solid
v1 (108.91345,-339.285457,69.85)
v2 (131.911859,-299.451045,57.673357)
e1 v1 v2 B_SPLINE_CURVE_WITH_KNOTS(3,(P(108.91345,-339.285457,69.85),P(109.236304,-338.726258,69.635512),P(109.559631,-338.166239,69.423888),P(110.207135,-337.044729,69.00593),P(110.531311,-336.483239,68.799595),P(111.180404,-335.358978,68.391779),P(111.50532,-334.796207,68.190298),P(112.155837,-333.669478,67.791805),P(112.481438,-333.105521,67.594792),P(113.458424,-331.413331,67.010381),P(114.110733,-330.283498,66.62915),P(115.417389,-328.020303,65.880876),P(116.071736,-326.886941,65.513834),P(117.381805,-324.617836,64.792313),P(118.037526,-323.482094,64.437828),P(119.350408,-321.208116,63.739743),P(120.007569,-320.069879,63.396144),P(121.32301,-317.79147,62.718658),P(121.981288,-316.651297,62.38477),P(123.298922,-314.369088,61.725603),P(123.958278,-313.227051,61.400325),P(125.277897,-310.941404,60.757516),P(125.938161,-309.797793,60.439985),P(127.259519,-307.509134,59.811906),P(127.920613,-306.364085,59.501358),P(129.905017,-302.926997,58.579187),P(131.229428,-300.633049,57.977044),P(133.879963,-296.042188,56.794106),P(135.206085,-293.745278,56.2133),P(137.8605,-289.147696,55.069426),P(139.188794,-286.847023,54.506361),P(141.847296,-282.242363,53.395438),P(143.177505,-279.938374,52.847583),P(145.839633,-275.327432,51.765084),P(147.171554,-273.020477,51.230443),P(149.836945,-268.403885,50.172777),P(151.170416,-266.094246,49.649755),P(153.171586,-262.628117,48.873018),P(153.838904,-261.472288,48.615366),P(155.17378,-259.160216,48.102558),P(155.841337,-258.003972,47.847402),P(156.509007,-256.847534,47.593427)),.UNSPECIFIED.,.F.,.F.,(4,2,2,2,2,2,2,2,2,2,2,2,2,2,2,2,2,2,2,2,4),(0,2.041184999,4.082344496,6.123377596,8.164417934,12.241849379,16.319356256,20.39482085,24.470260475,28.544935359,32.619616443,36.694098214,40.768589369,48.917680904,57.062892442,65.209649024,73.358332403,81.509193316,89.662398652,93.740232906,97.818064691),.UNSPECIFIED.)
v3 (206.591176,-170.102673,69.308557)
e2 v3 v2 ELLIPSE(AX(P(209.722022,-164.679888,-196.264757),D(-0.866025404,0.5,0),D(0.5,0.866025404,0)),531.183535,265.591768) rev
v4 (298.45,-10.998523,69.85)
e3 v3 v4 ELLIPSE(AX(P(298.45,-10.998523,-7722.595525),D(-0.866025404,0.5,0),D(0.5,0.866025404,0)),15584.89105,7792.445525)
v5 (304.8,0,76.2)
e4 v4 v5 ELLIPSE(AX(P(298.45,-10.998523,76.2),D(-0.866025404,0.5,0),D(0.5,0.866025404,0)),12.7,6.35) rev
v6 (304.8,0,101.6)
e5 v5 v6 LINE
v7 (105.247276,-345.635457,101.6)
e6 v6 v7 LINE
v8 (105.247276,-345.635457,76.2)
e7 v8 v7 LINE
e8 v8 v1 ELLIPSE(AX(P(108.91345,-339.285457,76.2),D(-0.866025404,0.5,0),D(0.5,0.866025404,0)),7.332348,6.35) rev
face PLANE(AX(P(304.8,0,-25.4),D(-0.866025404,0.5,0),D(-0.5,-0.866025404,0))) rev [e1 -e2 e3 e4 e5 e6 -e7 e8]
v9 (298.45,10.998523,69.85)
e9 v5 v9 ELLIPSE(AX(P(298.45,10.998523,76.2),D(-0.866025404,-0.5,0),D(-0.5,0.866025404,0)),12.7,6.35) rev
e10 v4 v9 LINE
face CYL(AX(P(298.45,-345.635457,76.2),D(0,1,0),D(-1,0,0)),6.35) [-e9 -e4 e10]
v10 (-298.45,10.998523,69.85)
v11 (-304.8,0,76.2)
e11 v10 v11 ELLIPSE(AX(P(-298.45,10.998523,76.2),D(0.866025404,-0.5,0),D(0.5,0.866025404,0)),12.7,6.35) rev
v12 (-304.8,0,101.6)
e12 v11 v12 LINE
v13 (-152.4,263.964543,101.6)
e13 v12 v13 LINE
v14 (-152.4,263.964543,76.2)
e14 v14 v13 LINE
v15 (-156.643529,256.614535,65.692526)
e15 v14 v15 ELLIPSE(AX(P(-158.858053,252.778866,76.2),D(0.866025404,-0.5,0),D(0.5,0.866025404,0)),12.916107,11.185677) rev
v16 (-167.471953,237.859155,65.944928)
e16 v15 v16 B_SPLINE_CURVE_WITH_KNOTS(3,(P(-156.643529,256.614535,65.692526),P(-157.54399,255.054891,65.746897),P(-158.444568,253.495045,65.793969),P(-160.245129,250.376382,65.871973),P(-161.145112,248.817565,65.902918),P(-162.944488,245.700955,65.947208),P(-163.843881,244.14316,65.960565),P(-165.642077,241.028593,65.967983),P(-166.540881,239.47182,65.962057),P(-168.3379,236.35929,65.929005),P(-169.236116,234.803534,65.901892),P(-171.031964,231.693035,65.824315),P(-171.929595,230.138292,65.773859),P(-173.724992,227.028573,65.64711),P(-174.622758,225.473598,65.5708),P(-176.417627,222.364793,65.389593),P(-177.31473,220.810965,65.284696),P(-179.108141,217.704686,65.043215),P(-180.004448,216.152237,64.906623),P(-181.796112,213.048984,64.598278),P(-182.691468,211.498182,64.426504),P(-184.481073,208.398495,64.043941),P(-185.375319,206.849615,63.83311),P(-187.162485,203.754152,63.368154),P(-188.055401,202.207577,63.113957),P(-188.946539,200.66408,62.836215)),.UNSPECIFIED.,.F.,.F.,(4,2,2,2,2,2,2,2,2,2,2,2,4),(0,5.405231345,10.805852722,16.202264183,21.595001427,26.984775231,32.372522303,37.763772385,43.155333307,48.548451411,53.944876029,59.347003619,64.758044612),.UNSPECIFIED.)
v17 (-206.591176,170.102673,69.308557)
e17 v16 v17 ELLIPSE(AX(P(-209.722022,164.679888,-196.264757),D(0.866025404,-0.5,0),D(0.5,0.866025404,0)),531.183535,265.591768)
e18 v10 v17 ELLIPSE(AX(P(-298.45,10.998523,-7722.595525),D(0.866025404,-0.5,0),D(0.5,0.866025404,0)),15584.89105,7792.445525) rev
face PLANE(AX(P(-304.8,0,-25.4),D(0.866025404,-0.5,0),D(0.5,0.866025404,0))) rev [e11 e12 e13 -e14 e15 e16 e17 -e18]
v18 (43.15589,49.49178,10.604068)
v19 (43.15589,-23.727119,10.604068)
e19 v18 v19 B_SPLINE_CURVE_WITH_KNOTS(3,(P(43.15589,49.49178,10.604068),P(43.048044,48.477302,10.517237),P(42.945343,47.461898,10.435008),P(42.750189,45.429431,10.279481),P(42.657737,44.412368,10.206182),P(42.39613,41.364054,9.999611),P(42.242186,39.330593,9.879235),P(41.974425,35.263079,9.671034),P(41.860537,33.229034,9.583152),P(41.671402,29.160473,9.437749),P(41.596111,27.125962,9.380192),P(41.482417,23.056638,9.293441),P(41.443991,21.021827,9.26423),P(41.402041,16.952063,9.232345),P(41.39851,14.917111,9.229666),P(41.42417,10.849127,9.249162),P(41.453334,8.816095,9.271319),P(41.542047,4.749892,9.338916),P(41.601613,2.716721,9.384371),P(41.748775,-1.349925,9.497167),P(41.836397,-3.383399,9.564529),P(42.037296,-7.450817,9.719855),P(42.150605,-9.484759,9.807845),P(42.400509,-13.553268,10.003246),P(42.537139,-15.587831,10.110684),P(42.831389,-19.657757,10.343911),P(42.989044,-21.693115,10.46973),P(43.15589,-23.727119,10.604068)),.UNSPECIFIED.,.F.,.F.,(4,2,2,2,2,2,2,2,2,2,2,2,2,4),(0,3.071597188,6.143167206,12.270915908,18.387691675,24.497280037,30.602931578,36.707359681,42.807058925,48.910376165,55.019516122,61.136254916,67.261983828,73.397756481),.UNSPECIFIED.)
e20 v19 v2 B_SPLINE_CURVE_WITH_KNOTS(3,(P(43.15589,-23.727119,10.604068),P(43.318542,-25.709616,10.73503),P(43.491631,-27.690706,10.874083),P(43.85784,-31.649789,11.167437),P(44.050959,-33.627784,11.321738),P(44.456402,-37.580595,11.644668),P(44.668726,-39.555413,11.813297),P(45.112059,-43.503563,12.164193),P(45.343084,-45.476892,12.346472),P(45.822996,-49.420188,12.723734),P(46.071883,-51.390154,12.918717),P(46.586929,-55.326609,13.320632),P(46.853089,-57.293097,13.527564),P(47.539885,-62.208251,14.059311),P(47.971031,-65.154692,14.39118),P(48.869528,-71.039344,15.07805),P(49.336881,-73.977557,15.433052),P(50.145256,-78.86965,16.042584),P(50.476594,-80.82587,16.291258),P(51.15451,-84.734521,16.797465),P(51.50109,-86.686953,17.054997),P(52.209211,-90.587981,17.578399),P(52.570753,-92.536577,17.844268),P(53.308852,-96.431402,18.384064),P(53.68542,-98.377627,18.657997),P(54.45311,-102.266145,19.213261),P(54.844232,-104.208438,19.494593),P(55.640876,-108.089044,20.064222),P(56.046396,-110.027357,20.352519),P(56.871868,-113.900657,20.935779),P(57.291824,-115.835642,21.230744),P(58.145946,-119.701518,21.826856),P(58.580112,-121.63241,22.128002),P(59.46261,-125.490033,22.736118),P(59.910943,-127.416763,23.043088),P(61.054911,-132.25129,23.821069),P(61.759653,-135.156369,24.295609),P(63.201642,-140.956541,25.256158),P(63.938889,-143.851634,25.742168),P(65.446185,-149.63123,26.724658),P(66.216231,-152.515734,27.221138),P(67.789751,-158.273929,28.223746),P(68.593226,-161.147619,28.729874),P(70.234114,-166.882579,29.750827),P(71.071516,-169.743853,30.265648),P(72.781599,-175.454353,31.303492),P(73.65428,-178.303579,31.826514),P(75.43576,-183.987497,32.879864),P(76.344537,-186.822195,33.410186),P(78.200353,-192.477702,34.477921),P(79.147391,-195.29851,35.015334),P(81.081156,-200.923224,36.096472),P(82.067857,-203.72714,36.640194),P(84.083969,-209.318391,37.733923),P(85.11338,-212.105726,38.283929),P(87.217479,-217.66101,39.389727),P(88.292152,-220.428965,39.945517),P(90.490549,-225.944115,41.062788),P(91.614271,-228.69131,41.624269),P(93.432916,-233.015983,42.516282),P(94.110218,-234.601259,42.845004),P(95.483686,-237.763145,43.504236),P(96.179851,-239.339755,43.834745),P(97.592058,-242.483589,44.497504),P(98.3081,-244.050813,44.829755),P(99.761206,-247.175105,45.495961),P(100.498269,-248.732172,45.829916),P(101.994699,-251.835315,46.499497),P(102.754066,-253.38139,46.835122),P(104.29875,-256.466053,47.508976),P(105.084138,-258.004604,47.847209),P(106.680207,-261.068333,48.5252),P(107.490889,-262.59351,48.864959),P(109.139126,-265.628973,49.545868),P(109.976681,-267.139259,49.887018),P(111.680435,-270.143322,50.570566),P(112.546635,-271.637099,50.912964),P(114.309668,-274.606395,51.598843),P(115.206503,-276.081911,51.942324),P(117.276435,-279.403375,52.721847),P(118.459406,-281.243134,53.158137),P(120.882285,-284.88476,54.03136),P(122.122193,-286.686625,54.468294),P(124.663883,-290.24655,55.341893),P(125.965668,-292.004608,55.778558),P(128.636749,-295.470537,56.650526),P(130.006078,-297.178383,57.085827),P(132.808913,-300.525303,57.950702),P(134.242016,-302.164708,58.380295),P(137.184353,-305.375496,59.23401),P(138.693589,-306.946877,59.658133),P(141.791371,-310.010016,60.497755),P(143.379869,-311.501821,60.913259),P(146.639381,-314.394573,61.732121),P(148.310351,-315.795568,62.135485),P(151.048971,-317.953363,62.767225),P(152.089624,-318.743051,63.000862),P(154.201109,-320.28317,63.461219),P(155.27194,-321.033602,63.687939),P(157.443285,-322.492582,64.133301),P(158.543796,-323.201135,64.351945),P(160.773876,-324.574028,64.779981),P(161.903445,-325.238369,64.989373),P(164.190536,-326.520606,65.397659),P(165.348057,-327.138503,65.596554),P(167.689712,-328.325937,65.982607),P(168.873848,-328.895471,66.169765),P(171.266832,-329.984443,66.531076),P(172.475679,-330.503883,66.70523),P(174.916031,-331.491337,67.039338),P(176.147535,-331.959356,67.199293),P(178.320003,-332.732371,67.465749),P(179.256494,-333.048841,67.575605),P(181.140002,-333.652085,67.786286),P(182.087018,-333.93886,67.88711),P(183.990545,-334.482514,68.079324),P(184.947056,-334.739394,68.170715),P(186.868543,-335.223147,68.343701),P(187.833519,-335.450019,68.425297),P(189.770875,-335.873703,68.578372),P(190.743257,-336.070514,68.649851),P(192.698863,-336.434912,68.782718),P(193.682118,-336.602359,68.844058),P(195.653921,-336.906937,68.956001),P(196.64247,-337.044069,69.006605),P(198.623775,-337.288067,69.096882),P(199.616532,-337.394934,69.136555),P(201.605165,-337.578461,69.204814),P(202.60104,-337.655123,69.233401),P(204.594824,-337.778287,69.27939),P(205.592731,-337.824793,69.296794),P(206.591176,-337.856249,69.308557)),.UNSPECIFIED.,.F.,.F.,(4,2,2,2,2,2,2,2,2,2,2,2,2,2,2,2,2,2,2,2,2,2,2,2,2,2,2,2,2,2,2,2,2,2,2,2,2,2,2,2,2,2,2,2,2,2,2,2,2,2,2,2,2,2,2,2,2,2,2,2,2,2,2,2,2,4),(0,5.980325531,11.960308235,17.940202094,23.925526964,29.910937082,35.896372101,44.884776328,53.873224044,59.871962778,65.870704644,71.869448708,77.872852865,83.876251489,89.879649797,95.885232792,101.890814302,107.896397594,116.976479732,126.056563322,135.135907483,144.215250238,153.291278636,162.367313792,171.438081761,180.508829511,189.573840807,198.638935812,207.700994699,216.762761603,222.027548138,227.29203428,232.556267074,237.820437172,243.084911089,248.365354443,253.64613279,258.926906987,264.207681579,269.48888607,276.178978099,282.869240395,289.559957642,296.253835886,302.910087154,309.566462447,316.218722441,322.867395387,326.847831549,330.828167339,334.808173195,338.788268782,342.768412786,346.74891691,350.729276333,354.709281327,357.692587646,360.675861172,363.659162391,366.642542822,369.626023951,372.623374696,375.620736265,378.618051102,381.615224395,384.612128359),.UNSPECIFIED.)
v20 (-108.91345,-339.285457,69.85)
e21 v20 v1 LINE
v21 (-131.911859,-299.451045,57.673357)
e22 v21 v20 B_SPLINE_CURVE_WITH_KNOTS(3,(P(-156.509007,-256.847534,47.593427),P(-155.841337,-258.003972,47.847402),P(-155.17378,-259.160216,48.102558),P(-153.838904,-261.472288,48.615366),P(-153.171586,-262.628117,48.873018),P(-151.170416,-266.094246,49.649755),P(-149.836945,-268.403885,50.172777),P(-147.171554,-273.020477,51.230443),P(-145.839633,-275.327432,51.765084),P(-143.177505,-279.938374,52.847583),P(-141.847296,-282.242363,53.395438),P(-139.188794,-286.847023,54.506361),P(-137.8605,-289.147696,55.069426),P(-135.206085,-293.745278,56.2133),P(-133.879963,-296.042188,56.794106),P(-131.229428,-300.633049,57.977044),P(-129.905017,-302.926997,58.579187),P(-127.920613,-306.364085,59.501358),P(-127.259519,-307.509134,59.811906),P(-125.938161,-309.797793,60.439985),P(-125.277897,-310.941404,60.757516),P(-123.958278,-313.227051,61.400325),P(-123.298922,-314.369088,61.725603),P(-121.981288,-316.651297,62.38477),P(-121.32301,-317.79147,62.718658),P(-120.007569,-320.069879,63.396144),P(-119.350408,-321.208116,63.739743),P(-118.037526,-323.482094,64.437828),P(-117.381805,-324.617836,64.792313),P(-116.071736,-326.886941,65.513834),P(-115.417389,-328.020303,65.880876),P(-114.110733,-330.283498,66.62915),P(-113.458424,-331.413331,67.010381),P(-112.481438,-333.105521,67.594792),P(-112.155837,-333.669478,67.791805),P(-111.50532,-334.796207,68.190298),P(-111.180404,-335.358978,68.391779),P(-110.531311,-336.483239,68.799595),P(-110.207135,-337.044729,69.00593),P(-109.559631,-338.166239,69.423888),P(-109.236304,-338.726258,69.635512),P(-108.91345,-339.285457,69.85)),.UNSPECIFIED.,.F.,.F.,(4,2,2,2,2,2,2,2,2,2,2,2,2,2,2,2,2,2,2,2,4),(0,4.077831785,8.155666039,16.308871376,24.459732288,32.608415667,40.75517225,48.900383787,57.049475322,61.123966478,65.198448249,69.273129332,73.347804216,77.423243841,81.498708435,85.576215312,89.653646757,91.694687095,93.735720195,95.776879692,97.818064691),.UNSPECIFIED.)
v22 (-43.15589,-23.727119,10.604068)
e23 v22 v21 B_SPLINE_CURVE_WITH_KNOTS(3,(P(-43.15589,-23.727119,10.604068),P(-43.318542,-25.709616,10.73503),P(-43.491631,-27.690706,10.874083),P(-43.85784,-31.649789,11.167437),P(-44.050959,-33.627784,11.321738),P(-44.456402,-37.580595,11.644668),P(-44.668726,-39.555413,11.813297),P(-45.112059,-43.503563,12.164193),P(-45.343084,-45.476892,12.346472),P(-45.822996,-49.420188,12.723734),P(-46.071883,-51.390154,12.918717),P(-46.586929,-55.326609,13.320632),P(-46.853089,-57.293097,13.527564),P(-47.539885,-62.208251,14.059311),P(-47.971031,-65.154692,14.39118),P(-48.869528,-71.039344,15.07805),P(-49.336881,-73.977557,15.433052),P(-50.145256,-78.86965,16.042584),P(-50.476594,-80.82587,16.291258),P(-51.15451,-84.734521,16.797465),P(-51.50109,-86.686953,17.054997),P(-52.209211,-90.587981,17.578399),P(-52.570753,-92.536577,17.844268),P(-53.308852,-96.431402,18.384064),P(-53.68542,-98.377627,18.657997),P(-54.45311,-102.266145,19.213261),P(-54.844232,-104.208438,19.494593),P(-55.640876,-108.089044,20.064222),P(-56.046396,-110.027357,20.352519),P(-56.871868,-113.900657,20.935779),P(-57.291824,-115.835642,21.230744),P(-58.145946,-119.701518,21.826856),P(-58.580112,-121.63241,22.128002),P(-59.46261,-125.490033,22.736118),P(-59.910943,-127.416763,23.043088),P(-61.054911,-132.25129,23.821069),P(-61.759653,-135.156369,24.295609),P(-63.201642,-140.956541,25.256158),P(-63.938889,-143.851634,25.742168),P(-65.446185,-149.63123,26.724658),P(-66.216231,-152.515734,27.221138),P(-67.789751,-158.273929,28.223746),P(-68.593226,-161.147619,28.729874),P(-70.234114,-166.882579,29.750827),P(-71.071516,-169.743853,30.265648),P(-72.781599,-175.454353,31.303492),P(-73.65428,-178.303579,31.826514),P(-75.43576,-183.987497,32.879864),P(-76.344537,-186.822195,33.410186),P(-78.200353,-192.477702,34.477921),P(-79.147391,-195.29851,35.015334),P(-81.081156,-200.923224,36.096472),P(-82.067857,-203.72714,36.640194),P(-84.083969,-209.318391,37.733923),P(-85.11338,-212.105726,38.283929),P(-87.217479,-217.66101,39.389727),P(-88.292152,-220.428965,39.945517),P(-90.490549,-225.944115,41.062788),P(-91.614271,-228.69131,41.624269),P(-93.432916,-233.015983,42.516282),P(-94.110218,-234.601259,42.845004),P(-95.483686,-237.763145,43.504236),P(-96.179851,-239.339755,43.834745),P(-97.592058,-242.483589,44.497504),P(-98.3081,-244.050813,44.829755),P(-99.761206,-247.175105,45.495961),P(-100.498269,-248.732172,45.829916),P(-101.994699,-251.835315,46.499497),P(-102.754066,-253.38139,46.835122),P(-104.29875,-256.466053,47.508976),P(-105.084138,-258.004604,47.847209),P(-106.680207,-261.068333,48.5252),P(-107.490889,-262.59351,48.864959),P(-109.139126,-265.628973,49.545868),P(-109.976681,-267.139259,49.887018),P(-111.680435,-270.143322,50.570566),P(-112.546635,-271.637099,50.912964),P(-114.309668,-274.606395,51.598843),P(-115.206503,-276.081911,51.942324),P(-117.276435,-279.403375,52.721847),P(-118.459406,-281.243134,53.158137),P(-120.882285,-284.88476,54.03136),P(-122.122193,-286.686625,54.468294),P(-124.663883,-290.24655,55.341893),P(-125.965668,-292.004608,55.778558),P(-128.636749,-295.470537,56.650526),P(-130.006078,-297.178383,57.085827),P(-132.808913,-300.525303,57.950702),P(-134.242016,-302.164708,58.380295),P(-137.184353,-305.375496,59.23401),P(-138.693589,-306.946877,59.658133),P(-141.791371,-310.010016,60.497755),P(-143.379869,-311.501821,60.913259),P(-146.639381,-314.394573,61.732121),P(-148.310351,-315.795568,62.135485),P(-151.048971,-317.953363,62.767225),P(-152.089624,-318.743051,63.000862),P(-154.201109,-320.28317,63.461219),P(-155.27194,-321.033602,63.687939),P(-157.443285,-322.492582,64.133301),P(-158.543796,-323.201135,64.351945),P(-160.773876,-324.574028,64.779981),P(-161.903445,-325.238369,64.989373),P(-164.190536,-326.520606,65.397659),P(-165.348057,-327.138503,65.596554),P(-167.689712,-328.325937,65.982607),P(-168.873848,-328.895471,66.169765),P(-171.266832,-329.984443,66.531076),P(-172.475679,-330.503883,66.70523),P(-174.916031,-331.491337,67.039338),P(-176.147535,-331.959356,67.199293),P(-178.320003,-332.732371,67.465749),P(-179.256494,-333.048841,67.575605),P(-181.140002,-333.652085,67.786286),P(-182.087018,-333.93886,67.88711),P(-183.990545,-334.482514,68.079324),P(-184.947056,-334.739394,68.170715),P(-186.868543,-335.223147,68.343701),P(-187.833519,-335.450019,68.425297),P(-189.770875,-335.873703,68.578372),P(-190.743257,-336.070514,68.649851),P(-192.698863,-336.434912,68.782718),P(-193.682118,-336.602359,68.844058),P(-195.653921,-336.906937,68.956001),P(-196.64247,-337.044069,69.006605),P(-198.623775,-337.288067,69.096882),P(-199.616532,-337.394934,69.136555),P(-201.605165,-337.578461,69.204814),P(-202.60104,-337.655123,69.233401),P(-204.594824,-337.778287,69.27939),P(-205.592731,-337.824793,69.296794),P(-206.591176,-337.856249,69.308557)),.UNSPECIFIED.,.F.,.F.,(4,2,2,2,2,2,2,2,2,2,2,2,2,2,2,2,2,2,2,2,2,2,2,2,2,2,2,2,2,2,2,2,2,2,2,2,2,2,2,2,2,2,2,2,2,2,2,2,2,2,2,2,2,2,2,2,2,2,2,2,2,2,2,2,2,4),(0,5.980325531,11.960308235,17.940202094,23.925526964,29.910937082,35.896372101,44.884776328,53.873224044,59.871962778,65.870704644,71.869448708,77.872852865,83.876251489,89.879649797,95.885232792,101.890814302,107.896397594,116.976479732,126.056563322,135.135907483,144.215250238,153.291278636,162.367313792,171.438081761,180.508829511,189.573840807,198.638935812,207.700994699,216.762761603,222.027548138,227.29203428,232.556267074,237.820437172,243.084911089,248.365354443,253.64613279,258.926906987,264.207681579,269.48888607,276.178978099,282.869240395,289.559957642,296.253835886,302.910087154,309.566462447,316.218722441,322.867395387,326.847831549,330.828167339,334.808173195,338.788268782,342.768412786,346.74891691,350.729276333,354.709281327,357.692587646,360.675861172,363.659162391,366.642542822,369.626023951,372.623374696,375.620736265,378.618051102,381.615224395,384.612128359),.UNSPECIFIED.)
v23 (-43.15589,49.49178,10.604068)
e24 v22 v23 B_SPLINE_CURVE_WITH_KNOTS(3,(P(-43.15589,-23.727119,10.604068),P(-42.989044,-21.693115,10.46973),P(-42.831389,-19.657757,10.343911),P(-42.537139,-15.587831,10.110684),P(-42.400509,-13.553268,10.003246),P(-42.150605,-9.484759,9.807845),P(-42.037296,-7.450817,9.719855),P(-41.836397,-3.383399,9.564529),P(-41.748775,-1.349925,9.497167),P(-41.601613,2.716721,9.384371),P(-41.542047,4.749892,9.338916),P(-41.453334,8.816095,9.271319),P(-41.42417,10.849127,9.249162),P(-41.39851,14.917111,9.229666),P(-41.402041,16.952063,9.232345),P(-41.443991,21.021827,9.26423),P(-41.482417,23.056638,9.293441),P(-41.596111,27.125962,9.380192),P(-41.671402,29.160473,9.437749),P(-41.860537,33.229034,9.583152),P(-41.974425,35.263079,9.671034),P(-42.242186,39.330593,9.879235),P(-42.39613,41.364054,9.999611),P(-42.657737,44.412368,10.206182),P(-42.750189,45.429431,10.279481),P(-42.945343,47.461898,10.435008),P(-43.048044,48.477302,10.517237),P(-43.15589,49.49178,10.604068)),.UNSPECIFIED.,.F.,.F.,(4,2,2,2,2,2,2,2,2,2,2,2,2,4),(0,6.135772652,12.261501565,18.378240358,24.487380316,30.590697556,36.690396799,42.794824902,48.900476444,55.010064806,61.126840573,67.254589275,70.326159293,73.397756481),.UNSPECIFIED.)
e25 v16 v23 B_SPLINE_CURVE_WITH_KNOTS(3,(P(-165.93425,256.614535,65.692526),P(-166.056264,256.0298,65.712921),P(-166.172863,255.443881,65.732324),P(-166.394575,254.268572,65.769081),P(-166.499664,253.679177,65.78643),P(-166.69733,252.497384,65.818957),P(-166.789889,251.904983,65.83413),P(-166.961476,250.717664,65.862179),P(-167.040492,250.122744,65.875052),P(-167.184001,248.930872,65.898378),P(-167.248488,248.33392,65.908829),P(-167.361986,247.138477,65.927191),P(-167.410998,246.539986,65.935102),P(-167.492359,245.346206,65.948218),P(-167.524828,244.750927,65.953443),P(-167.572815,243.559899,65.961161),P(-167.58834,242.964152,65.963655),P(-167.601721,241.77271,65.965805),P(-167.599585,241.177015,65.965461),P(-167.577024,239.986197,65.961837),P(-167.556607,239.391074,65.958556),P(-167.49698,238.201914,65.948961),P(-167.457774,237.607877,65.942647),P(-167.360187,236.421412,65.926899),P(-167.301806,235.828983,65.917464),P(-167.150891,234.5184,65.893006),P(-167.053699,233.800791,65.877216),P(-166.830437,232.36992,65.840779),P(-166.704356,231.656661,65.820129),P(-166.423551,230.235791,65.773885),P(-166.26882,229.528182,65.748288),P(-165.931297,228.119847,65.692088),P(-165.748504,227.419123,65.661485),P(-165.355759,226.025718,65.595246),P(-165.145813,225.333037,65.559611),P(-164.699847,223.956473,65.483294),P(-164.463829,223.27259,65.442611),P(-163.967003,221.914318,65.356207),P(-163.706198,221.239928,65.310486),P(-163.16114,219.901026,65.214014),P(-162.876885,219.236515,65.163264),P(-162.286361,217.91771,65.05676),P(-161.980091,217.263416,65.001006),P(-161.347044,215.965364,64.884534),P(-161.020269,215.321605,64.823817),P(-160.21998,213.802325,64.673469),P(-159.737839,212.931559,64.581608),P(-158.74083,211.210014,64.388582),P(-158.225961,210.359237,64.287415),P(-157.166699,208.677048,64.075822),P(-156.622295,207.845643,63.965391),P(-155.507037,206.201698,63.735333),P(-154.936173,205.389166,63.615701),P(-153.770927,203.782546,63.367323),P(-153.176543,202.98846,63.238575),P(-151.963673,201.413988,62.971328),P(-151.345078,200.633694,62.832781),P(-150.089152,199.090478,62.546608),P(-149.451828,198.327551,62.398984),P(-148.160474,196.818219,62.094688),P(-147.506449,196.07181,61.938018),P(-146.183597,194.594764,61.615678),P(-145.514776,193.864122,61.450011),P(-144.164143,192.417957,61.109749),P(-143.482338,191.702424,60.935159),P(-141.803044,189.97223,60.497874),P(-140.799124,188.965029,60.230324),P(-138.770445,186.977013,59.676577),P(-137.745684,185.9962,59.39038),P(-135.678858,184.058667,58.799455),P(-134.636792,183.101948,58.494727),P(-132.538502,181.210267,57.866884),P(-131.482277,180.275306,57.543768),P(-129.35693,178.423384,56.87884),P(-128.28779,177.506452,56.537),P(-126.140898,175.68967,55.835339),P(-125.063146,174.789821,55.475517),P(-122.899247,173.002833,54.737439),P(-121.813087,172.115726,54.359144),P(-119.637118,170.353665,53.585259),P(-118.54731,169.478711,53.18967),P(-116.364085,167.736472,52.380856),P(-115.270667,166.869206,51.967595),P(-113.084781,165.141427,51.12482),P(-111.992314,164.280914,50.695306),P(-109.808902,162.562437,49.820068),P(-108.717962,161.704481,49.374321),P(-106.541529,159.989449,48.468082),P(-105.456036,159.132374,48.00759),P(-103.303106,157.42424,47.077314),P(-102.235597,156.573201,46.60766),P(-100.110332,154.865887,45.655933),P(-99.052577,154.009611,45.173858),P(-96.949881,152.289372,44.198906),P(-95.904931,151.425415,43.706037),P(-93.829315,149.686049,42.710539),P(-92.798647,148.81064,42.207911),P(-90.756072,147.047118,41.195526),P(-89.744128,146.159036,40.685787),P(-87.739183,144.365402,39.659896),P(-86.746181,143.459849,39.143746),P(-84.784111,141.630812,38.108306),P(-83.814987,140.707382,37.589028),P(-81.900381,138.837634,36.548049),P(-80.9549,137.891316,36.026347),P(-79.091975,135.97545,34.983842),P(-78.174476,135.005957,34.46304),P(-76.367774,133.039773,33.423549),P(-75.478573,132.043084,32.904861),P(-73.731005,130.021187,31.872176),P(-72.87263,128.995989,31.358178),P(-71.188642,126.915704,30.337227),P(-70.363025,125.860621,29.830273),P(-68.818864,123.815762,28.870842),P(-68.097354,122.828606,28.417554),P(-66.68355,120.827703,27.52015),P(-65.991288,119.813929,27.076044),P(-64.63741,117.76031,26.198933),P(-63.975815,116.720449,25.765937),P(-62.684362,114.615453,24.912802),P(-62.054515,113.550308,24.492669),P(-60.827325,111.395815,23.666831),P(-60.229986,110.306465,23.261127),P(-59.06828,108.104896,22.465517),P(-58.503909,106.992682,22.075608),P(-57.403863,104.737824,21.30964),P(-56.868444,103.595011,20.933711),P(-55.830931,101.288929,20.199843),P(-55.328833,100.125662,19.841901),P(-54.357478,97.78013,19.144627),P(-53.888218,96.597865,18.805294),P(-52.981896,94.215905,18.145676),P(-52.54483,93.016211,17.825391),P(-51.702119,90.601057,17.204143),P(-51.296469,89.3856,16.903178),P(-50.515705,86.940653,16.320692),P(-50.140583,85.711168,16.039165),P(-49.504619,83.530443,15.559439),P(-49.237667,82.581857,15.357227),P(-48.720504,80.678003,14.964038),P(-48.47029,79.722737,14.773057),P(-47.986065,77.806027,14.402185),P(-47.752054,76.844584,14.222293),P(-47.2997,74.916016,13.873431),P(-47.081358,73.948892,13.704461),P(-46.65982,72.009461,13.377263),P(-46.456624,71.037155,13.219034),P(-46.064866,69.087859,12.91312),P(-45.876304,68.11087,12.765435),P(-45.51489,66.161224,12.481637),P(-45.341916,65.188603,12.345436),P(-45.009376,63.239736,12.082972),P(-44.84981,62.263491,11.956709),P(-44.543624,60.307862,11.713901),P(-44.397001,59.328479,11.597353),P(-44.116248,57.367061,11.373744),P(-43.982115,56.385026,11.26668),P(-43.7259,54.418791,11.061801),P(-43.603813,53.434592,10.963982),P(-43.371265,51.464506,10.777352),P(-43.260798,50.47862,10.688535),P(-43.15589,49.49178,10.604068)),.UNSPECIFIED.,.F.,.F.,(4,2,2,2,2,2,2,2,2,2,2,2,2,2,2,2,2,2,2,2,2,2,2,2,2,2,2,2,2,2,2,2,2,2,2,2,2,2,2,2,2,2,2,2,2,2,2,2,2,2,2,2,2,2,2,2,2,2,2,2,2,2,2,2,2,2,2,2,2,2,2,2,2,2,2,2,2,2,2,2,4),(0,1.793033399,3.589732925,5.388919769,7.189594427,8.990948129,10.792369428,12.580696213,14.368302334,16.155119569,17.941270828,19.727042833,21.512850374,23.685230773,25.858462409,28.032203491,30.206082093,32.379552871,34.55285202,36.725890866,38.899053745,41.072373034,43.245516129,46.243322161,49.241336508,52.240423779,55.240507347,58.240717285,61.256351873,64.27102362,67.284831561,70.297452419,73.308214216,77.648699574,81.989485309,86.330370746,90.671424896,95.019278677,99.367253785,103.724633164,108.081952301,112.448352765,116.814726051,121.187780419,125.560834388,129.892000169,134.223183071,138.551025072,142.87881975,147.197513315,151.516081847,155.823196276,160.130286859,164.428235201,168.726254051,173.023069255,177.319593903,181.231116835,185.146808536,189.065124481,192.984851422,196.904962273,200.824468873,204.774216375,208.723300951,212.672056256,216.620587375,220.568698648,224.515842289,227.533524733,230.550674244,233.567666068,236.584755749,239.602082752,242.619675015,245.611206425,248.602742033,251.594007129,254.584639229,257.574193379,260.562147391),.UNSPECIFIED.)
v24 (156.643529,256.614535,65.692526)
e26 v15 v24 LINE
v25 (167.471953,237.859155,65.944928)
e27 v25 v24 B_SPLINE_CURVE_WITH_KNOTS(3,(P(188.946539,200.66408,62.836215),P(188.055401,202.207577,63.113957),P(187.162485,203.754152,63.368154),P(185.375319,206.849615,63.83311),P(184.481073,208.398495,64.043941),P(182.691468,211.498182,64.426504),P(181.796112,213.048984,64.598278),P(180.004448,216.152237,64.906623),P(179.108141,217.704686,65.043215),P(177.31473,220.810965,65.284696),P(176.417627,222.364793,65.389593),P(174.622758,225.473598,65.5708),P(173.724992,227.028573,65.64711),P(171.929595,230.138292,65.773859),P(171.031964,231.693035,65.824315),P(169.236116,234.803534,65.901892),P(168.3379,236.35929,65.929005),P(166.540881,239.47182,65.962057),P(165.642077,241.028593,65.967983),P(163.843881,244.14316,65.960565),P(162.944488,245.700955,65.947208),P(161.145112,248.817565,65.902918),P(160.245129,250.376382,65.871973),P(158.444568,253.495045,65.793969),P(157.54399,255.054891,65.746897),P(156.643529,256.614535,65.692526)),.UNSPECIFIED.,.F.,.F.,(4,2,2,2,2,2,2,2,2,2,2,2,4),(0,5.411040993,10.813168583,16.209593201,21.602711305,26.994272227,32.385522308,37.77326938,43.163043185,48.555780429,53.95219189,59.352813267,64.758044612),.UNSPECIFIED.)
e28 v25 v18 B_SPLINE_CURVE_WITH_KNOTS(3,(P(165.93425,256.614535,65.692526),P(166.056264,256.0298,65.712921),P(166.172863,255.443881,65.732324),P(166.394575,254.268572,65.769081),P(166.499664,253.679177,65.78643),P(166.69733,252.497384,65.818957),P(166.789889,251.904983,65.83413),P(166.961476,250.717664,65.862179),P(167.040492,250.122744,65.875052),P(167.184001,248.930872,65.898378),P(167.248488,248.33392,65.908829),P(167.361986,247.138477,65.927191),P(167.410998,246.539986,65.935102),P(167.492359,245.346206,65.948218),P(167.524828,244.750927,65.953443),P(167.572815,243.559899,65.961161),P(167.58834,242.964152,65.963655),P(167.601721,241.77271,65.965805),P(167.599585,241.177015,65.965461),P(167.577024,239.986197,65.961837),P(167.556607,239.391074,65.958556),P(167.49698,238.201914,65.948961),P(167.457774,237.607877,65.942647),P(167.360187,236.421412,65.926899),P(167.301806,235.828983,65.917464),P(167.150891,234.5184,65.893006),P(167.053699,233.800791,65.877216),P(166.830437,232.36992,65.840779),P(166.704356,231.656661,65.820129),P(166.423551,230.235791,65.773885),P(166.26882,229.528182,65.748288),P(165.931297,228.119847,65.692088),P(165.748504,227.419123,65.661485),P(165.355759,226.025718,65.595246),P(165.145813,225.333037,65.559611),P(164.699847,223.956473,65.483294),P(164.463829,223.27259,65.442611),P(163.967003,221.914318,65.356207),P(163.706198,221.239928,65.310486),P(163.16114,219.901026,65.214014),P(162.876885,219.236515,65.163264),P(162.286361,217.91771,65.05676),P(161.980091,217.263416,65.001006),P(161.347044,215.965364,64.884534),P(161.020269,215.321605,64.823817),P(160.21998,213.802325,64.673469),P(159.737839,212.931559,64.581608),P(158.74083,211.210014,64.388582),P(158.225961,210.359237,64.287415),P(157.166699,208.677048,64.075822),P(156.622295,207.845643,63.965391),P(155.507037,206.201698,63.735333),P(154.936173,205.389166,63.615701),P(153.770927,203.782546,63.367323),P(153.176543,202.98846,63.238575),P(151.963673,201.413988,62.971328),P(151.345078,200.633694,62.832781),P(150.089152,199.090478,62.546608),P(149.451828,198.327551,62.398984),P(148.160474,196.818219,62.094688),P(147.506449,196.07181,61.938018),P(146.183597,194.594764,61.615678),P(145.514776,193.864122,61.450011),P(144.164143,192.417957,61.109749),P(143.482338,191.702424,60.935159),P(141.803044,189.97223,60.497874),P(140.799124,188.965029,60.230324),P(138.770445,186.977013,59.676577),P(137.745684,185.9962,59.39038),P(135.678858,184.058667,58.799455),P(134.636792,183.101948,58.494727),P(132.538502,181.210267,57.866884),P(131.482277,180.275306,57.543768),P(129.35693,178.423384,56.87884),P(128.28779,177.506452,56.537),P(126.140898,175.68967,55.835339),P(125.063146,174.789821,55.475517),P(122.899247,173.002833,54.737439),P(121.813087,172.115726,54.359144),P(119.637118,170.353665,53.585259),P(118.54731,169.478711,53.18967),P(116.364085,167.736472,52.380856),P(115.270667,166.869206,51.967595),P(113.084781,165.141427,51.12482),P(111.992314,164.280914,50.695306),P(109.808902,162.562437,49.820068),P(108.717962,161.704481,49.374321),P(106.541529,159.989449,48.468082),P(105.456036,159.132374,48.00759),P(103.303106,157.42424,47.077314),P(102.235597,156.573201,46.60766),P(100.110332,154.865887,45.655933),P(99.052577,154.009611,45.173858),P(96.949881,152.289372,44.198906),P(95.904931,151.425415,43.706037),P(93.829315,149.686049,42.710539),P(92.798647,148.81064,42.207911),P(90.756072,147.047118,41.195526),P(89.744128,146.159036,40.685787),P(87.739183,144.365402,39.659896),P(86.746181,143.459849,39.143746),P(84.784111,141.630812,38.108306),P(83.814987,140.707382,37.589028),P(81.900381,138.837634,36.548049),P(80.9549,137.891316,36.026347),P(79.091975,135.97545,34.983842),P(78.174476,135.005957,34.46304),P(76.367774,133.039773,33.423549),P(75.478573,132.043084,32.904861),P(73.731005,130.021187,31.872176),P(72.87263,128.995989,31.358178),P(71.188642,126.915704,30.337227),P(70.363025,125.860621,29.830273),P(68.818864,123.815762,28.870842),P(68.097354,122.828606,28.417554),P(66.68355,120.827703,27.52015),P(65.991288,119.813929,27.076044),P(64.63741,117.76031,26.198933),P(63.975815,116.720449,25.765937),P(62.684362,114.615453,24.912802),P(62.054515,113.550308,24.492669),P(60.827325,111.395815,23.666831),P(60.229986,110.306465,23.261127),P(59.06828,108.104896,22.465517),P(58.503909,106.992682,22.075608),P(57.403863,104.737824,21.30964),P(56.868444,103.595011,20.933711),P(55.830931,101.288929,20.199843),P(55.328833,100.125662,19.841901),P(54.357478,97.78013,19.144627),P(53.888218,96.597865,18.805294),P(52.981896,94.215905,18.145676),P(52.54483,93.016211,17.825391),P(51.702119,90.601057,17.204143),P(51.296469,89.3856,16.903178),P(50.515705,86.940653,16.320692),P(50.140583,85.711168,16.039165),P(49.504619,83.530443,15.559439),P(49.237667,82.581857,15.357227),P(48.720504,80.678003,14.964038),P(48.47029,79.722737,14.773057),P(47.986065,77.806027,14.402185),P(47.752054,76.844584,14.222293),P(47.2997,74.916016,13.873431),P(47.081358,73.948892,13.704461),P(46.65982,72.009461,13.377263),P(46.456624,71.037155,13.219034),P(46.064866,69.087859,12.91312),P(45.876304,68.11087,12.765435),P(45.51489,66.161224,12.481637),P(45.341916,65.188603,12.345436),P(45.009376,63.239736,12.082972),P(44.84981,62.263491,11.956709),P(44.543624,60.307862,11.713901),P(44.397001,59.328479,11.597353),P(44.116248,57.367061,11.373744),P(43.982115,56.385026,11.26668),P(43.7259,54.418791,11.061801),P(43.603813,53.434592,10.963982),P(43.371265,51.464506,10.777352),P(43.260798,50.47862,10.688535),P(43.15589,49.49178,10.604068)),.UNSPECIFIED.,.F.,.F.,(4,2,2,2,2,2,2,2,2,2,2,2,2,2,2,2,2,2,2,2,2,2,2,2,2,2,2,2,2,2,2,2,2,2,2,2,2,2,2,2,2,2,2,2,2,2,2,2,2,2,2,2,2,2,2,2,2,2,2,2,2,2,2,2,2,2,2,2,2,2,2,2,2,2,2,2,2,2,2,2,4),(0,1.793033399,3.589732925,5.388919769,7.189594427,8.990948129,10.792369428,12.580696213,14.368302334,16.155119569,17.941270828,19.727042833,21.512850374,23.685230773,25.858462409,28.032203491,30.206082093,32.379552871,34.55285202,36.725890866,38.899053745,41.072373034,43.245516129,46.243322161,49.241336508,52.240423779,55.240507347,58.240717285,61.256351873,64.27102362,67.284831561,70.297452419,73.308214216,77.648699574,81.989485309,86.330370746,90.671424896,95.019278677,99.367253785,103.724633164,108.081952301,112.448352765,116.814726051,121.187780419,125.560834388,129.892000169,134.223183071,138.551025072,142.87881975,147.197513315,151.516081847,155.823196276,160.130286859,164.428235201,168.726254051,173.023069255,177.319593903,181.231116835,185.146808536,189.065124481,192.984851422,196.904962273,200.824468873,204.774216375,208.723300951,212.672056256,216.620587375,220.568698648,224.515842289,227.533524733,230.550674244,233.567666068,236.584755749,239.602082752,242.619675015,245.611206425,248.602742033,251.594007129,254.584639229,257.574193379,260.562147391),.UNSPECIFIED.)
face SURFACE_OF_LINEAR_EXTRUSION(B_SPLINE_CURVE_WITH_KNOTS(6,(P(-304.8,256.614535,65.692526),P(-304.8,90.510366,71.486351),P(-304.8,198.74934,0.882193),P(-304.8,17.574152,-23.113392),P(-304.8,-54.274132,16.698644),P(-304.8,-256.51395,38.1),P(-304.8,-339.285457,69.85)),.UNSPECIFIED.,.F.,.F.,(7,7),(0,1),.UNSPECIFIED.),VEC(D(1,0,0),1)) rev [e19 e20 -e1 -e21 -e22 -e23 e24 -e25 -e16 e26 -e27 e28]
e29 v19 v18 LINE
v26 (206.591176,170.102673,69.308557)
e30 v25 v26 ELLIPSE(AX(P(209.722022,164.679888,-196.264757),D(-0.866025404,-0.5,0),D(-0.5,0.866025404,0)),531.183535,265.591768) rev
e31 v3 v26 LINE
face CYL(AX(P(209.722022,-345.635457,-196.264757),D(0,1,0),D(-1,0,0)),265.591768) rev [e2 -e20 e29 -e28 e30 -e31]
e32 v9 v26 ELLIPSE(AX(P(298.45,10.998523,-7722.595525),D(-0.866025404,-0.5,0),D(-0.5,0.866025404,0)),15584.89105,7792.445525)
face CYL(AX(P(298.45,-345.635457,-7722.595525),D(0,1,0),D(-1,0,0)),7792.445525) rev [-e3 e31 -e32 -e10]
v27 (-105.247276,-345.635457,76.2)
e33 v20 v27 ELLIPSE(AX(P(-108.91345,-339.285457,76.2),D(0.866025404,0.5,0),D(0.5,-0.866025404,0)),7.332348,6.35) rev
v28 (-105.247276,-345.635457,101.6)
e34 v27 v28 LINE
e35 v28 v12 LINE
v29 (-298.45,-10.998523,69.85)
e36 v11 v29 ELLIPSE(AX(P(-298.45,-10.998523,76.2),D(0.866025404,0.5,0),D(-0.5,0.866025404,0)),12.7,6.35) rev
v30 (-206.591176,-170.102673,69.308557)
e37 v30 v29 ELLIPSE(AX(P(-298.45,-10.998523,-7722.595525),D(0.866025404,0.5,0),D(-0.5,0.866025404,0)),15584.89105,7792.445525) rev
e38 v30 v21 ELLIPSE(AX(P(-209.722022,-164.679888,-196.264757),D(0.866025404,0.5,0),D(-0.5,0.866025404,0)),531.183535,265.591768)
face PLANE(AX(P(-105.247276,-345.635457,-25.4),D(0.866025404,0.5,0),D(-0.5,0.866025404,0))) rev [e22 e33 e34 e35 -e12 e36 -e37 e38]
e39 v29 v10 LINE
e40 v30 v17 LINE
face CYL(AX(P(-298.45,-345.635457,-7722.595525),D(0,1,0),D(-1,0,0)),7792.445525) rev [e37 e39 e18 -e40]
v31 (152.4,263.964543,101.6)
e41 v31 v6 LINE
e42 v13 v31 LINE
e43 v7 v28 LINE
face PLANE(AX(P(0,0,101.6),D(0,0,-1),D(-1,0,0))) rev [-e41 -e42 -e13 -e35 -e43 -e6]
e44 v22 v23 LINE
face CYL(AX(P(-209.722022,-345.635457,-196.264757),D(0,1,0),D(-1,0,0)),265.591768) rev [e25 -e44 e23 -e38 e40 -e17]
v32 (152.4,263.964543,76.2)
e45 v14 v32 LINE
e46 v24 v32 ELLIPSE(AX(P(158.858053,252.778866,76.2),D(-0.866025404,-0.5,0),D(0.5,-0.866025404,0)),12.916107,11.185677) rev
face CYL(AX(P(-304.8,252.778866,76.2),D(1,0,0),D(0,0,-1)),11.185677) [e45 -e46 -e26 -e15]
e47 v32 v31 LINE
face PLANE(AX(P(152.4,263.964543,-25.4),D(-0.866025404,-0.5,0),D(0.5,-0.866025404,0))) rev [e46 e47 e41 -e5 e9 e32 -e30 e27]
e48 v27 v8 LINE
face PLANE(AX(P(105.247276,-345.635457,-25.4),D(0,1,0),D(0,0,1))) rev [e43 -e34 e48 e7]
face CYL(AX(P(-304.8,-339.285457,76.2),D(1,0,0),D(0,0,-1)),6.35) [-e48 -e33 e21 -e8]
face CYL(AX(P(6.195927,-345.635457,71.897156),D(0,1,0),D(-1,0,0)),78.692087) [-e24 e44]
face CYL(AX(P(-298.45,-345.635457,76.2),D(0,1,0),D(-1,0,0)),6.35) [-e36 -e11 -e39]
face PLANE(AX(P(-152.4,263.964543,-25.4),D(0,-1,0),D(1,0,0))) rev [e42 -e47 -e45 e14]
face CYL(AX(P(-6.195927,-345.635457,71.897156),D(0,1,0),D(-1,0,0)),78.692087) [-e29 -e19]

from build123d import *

# Parameters (mm, degrees)
BOSS_EXTRUDE1_DEPTH      = 101.6
BOSS_EXTRUDE1_DEPTH_BACK = 25.4
CUT_EXTRUDE5_DEPTH       = 690.084726286
CUT_EXTRUDE7_START       = -167.47195291
CUT_EXTRUDE7_DEPTH       = 334.94390582


with BuildPart() as part:
    # Sketch2 → Boss-Extrude1 (new, two sides: drawn at the far end of the back side and taken through both)
    with BuildSketch(Plane.XY.offset(-BOSS_EXTRUDE1_DEPTH_BACK)):
        Polygon((-152.4, 263.964543073), (152.4, 263.964543073), (304.8, 0), (105.247275902, -345.635456927), (-105.247275902, -345.635456927), (-304.8, 0), align=None)
    extrude(amount=BOSS_EXTRUDE1_DEPTH + BOSS_EXTRUDE1_DEPTH_BACK)

    # Sketch3 → Cut-Extrude5 (cut, through all)
    with BuildSketch(Plane(origin=(0, 263.964543073, 0), x_dir=(1, 0, 0), z_dir=(0, 1, 0))):
        with BuildLine():
            Line((-304.8, -76.2), (-304.8, 25.4))
            Line((-304.8, 25.4), (304.8, 25.4))
            Line((304.8, 25.4), (304.8, -76.2))
            ThreePointArc((304.8, -76.2), (302.940128061, -71.709871939), (298.45, -69.85))
            ThreePointArc((298.45, -69.85), (252.51979015, -69.714637969), (206.591176001, -69.30855658))
            ThreePointArc((206.591176001, -69.30855658), (119.939950937, -53.691572752), (43.155890442, -10.604068265))
            ThreePointArc((43.155890442, -10.604068265), (34.818219716, -4.738506069), (25.792249783, 0))
            ThreePointArc((25.792249783, 0), (0, 5.478791422), (-25.792249783, 0))
            ThreePointArc((-25.792249783, 0), (-34.818219716, -4.738506069), (-43.155890442, -10.604068265))
            ThreePointArc((-43.155890442, -10.604068265), (-119.939950937, -53.691572752), (-206.591176001, -69.30855658))
            ThreePointArc((-206.591176001, -69.30855658), (-252.51979015, -69.714637969), (-298.45, -69.85))
            ThreePointArc((-298.45, -69.85), (-302.940128061, -71.709871939), (-304.8, -76.2))
        make_face()
    extrude(amount=-CUT_EXTRUDE5_DEPTH, mode=Mode.SUBTRACT)

    # Cut-Extrude7: read off the stored shape, not the designer's step
    # Cut-Extrude7 outline → Cut-Extrude7 (cut)
    with BuildSketch(Plane(origin=(0, 0, 0), x_dir=(0, 0, -1), z_dir=(1, 0, 0)).offset(CUT_EXTRUDE7_START)):
        with BuildLine():
            ThreePointArc((-76.2, 263.964543073), (-69.788494044, 261.94466991), (-65.692525933, 256.614534691))
            add(Edge.make_bspline(
                [(-65.692525933, 256.614534691), (-71.486350731, 90.510366485), (-0.882192536, 198.749340281), (23.113391949, 17.574151868), (-16.69864439, -54.274132463), (-38.1, -256.513950378), (-69.85, -339.285456927)],
                knots=[0, 0, 0, 0, 0, 0, 0, 1, 1, 1, 1, 1, 1, 1], degree=6))
            ThreePointArc((-69.85, -339.285456927), (-71.709871939, -343.775584987), (-76.2, -345.635456927))
            Line((-76.2, -345.635456927), (7, -345.635456927))
            Line((7, -345.635456927), (7, 263.964543073))
            Line((7, 263.964543073), (-76.2, 263.964543073))
        make_face()
    extrude(amount=CUT_EXTRUDE7_DEPTH, mode=Mode.SUBTRACT)


solid = part.part
